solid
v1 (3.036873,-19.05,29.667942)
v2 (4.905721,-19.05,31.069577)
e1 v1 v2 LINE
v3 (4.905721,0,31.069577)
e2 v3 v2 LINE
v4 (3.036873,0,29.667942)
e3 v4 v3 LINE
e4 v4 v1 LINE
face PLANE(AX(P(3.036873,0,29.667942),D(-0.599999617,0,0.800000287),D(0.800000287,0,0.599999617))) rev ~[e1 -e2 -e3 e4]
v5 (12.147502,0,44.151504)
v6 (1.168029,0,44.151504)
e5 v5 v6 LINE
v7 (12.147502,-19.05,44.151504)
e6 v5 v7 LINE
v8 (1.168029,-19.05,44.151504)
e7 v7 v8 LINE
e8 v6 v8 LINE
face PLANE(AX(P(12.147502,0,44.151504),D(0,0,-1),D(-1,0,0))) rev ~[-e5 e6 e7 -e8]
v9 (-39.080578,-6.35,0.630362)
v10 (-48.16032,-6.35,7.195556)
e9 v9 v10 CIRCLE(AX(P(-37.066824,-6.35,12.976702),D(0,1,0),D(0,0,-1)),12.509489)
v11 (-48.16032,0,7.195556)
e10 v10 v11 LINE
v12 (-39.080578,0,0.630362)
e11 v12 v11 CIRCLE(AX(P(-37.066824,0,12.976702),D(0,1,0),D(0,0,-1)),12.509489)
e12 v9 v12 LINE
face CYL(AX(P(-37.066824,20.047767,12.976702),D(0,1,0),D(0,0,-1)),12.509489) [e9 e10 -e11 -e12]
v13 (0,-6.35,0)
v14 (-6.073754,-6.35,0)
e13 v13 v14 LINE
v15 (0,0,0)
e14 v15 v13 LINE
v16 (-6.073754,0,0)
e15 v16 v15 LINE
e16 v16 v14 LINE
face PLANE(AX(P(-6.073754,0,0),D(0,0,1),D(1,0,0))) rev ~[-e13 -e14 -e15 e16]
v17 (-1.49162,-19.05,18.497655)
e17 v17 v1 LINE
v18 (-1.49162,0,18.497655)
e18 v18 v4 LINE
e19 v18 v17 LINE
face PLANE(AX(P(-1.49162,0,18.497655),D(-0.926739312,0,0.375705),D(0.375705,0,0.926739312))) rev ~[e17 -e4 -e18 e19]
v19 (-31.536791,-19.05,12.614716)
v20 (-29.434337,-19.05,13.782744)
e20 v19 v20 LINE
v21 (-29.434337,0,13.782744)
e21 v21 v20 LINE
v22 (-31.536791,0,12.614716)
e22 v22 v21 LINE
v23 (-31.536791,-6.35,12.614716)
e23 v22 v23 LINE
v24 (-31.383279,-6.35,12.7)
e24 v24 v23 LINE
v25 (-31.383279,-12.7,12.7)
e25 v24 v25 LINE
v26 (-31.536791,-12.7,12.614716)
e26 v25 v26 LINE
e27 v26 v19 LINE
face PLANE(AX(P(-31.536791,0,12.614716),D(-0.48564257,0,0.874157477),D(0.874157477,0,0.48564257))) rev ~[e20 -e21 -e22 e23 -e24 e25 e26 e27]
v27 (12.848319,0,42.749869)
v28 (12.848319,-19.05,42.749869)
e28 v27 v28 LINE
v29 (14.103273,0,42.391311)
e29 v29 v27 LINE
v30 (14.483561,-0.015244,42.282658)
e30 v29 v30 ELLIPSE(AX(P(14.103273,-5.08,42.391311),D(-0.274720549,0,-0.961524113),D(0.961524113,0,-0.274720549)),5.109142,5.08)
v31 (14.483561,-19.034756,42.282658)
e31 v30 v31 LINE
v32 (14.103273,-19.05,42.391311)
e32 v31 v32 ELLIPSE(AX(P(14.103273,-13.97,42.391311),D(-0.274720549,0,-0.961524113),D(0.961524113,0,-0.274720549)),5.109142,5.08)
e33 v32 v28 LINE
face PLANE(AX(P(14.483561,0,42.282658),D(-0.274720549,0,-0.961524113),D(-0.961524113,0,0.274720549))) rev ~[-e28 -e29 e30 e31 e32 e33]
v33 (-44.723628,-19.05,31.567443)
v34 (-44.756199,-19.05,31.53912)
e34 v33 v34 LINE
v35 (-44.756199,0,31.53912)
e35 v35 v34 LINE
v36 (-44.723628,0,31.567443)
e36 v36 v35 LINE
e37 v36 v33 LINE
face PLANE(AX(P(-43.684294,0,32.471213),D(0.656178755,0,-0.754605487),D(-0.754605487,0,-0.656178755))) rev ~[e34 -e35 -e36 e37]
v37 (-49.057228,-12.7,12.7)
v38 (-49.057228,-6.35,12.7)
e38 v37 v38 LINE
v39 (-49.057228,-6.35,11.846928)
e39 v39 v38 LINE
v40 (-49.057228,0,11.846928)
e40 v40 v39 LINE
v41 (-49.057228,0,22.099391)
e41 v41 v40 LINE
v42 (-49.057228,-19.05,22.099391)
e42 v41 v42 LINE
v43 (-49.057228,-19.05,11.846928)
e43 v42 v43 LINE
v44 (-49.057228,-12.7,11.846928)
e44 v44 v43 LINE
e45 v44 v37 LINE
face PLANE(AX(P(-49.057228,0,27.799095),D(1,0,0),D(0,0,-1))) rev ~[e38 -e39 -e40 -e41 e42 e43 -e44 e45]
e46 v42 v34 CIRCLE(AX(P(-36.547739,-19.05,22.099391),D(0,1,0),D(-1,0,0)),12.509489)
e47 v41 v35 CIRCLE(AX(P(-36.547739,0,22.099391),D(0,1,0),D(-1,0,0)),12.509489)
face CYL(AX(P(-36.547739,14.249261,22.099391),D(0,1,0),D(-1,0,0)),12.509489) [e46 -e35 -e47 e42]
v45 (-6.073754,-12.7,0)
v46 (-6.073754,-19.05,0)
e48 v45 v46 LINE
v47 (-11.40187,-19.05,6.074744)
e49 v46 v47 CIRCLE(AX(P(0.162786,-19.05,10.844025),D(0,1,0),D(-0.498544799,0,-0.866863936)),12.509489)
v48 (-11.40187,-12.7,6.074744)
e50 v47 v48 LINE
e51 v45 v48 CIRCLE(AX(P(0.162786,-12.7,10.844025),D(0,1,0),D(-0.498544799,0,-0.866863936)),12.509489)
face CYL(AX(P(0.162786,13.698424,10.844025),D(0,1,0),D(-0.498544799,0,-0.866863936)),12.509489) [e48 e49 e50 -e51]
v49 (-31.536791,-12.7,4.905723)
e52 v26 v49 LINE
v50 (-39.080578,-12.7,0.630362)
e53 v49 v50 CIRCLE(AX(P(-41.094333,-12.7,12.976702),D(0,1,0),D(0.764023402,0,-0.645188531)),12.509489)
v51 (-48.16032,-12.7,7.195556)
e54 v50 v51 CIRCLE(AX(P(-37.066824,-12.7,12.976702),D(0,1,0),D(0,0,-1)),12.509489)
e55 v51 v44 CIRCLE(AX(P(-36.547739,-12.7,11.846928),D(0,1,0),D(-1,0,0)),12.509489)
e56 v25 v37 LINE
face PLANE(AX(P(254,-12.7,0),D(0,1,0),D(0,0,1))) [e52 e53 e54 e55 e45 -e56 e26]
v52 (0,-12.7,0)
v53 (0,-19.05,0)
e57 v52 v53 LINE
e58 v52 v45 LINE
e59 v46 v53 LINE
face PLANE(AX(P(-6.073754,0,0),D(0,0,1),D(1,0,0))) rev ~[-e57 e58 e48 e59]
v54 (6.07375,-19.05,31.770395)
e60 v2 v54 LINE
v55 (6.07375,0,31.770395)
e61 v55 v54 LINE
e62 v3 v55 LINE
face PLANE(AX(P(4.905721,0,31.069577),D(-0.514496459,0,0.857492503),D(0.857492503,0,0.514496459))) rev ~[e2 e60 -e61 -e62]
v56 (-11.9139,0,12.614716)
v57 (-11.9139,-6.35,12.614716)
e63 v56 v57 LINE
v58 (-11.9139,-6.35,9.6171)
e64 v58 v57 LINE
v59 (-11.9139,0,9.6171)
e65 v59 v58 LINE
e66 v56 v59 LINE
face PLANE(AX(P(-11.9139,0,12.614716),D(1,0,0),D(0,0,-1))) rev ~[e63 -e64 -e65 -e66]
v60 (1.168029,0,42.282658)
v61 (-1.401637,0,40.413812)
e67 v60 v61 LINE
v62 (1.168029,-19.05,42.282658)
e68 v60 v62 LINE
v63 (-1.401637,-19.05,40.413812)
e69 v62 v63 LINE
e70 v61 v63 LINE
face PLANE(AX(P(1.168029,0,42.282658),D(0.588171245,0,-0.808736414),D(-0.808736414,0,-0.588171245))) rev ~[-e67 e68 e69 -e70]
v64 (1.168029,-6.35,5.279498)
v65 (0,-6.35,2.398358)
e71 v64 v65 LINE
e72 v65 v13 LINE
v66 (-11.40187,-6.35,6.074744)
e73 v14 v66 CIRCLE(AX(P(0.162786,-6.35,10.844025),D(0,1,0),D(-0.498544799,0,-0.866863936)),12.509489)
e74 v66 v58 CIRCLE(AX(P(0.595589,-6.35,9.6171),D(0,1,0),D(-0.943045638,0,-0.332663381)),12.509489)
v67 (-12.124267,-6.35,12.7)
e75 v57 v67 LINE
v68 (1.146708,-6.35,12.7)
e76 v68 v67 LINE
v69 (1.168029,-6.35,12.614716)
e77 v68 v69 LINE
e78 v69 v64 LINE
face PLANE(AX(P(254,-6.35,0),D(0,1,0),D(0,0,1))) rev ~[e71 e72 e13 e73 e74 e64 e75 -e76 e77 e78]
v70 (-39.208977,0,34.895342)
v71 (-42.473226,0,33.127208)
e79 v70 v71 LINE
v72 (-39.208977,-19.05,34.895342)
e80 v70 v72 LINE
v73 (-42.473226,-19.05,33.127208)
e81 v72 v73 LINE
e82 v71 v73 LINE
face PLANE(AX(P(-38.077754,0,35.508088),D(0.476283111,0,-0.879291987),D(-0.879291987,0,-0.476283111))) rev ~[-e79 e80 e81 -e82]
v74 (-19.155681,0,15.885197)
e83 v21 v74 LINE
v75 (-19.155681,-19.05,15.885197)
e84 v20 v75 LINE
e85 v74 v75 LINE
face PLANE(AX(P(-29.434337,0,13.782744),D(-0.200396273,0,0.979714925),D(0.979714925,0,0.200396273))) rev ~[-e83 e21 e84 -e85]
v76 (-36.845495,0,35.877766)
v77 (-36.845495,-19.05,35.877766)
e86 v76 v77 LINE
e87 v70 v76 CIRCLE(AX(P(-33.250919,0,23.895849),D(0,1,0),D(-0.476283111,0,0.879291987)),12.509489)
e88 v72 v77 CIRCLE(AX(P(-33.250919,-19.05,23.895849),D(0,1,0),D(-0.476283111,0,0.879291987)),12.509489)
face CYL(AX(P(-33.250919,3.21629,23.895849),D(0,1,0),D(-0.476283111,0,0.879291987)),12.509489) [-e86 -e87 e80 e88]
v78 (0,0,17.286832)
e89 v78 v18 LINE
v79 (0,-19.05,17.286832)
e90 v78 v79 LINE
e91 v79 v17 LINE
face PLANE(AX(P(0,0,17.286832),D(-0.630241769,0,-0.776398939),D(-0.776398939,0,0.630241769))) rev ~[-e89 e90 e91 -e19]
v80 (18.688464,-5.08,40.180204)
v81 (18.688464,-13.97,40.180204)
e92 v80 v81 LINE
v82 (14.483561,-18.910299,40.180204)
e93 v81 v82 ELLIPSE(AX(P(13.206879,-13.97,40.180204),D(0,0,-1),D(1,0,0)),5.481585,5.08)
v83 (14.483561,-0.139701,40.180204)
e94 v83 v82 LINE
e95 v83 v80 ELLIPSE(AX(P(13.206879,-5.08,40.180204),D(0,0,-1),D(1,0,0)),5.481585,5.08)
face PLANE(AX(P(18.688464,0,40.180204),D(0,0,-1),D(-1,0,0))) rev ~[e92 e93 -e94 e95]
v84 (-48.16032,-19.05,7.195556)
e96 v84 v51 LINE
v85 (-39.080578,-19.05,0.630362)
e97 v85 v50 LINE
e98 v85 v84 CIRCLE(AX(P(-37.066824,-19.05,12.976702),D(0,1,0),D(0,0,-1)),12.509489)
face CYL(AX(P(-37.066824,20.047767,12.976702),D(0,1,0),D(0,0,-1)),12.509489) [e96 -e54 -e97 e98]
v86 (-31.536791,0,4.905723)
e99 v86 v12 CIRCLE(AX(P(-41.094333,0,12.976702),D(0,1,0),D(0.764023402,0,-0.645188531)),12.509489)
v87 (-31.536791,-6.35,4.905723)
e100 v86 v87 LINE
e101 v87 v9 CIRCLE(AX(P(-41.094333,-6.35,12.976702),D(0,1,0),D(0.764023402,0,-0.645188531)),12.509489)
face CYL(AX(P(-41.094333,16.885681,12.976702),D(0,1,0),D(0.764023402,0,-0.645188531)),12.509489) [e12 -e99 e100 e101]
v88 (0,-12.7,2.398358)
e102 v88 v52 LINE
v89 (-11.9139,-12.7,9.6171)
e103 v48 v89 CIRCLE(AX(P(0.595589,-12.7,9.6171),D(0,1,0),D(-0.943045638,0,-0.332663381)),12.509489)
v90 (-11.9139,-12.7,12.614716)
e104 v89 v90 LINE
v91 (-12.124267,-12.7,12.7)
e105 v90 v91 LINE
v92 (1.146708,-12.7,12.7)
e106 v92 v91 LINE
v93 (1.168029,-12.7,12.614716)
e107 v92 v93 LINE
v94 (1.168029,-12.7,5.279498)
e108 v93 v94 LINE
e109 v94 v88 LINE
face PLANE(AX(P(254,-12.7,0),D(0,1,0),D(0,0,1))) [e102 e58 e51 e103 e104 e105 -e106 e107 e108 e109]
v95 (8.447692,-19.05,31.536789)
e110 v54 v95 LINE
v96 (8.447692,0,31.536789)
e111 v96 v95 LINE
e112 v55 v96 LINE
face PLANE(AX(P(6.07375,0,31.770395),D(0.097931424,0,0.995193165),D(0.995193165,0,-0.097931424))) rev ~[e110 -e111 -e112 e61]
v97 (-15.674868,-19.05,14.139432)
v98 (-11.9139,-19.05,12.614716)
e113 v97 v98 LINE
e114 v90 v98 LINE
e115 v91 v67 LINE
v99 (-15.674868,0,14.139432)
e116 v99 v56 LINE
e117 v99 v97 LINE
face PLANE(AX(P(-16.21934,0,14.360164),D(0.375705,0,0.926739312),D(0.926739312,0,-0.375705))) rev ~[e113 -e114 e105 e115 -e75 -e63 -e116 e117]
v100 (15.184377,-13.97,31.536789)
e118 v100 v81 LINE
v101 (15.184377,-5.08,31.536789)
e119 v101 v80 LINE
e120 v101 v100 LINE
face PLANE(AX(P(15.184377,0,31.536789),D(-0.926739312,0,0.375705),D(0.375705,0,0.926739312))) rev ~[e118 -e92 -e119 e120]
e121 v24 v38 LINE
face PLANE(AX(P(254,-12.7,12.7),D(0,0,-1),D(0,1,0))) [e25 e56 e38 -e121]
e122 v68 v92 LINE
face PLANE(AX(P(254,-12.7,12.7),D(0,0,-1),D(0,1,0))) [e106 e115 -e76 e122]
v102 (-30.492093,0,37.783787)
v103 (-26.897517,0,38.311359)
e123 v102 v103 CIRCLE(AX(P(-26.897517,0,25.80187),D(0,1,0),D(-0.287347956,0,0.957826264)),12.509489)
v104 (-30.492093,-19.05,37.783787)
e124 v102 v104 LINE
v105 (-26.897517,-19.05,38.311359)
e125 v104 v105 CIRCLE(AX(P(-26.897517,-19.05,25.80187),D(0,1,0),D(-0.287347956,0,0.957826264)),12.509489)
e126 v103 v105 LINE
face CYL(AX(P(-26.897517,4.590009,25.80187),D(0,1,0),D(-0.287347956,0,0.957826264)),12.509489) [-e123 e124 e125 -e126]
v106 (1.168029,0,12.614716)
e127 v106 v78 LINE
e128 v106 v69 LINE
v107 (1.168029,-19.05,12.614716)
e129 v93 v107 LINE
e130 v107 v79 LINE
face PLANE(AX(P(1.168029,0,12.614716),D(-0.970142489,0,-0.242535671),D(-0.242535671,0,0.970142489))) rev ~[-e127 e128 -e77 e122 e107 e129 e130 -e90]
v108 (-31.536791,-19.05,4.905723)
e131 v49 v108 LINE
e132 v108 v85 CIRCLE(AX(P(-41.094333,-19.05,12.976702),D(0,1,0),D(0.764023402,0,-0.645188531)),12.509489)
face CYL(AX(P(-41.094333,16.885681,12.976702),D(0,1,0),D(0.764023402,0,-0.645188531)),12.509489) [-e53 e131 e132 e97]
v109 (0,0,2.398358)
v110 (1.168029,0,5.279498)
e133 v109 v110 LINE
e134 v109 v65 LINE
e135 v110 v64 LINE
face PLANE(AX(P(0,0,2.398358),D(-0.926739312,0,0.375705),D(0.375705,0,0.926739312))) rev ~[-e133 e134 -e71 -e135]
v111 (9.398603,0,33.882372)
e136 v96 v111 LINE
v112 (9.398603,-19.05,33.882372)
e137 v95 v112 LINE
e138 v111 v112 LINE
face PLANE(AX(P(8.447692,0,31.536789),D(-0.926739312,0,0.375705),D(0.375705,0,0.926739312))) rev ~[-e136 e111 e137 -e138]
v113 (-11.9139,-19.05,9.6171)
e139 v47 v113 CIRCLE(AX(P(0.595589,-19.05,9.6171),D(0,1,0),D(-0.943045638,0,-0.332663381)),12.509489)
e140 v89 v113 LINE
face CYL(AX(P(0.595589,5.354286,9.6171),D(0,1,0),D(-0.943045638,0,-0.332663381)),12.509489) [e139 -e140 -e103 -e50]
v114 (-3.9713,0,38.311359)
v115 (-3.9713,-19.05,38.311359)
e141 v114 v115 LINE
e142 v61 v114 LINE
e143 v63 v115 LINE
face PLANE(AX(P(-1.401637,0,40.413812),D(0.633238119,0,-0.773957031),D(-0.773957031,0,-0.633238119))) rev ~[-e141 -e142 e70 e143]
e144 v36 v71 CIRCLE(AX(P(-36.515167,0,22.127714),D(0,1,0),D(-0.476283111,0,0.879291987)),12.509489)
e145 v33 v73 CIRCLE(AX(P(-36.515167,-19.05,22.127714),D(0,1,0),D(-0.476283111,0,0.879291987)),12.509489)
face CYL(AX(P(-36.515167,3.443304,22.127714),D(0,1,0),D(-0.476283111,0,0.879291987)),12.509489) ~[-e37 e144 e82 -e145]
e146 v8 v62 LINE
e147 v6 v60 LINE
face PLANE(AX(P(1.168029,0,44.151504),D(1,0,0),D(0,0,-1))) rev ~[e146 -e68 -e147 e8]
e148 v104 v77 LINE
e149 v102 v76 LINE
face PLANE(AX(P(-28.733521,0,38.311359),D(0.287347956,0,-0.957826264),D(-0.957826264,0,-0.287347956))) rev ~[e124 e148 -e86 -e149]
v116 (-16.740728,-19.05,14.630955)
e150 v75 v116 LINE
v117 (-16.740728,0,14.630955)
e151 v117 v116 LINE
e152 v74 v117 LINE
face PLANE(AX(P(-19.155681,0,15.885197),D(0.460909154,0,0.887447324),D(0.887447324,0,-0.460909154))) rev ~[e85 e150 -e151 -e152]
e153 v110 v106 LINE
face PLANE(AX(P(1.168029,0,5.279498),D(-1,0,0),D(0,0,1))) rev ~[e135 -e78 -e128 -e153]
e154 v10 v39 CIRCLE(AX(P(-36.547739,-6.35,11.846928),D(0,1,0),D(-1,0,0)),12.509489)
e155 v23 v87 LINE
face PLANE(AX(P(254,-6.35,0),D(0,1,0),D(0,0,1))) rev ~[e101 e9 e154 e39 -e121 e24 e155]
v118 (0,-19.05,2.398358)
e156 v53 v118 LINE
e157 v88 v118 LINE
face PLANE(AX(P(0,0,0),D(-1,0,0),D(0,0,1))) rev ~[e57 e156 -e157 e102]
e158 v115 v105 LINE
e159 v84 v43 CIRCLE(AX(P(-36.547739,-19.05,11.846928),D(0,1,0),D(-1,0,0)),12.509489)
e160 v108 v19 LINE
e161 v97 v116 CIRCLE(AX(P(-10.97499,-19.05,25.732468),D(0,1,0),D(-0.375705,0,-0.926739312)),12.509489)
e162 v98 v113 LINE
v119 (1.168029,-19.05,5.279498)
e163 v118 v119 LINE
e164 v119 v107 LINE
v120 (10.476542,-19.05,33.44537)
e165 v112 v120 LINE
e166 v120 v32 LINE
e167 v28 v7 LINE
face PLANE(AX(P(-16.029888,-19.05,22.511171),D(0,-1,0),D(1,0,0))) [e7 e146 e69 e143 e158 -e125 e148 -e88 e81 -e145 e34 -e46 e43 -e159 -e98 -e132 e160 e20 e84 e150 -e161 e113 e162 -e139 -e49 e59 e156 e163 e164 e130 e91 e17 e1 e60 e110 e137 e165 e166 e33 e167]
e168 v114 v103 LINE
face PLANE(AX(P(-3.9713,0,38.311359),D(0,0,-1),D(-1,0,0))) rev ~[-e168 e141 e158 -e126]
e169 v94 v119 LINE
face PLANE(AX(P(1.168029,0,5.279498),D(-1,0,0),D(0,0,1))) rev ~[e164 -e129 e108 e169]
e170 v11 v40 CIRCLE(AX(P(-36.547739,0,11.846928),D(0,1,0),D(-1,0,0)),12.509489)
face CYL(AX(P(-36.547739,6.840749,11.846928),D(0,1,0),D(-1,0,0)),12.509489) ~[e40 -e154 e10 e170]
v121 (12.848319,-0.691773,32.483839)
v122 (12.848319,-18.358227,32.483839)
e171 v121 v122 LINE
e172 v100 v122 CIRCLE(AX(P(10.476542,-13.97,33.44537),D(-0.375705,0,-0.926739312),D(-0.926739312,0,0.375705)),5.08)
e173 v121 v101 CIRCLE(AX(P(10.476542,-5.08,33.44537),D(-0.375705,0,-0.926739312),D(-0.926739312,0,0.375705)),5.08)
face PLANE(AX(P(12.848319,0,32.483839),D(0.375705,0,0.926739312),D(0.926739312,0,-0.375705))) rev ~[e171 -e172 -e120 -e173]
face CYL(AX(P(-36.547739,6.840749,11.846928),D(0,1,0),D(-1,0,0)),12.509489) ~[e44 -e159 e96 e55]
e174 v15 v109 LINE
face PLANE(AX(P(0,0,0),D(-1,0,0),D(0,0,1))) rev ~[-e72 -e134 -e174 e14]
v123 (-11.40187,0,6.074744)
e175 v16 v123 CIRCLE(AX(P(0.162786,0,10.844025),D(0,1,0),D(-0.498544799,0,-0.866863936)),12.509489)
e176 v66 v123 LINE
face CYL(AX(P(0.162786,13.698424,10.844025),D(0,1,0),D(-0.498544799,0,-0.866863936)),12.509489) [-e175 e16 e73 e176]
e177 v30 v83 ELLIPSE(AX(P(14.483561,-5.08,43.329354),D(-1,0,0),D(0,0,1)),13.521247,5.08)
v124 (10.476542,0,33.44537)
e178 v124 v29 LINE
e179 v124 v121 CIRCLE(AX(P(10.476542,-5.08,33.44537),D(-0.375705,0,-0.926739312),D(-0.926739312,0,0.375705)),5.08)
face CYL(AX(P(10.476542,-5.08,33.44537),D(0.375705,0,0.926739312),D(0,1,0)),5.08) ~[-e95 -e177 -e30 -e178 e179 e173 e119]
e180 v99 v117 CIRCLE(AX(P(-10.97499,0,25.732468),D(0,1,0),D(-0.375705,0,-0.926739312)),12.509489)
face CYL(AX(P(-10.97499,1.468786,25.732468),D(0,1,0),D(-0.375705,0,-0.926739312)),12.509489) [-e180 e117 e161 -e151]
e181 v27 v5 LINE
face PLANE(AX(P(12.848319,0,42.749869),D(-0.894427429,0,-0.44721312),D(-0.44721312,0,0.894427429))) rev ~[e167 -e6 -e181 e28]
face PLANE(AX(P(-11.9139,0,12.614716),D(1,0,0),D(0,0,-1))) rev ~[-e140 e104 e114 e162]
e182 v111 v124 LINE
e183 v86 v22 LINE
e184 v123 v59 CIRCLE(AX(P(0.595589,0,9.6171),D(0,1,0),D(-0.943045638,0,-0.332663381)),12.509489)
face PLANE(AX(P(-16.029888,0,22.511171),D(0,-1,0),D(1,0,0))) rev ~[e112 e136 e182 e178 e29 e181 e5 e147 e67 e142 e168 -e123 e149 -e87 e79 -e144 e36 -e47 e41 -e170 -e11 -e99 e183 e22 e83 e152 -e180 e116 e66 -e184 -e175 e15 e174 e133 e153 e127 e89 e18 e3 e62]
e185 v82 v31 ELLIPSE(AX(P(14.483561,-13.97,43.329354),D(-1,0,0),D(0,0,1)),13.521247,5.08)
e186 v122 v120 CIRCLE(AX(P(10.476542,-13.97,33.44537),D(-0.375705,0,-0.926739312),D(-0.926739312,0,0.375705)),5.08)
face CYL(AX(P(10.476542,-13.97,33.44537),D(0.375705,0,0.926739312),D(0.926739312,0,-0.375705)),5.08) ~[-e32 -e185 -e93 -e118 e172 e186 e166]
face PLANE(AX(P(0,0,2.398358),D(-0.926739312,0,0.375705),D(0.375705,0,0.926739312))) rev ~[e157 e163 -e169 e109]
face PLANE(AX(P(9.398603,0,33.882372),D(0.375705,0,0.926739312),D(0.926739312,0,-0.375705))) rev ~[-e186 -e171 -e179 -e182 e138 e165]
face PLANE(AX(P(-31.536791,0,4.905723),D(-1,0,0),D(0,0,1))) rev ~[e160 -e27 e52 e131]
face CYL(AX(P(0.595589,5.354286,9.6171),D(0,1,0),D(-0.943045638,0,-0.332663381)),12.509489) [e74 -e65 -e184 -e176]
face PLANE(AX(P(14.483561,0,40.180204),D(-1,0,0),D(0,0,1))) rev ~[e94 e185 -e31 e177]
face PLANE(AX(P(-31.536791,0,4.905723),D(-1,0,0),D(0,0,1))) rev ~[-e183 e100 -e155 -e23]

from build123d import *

# Parameters (mm, degrees)
F1_DEPTH     = 19.05
F2_T1_DEPTH  = 28.2300180496
F2_T3_DEPTH  = 25.482580603
F2_T5_DEPTH  = 25.9366089247
F2_T7_DEPTH  = 47.5485210799
F2_T9_DEPTH  = 32.7314977927
F2_T11_DEPTH = 59.1455336843
F2_T13_DEPTH = 52.8213628452
F2_T15_DEPTH = 21.9875710363
F2_T17_DEPTH = 46.4468482438
F2_T19_DEPTH = 29.758572197
F3_R         = 5.08
F5_W         = 6.35
F5_H         = 12.7
F6_DEPTH     = 303.0582275594


# Not quite as in the source:
# - a fillet or chamfer that OpenCascade refuses, or shapes differently, is made with other operations: its cross-section is extruded or revolved along the edge and cut away or added


with BuildPart() as f1:
    # F0 (on Front) → F1 (new body)
    with BuildSketch(Plane.XZ):
        Polygon((-45.0859302655, 0.4672128707), (-34.340060316, 0.4672128707), (-31.5367905423, 4.9057230353), (-31.5367905423, 9.1106286272), (-31.5367905423, 12.6147158444), (-29.4343372807, 13.7827442959), (-19.1556811333, 15.8851970918), (-16.2193404098, 14.3601642462), (-11.9138995651, 12.6147158444), (-11.9138995651, 9.1106286272), (-11.9138995651, 7.4753854424), (-9.811447002, 1.5152803213), (-6.0737542808, 0), (0, 0), (0, 2.3983575983), (1.1680293828, 5.2794977153), (1.1680293828, 9.1106286272), (1.1680293828, 12.6147158444), (0, 17.2868324444), (-1.4916199837, 18.4976548306), (3.0368734151, 29.6679423191), (4.9057211727, 31.0695767403), (6.0737496242, 31.770395115), (8.4476916948, 31.5367886797), (9.3986034807, 33.8823718767), (12.8483185545, 32.4838392109), (15.1843773201, 31.5367886797), (18.6884636059, 40.1802044362), (14.483560808, 40.1802044362), (14.483560808, 42.2826576978), (12.8483185545, 42.7498687059), (12.1475020424, 44.1515035927), (8.1762028858, 44.1515035927), (5.3729321808, 44.1515035927), (1.1680293828, 44.1515035927), (1.1680293828, 42.2826576978), (-1.4016367495, 40.4138118029), (-3.9712996222, 38.3113585413), (-14.7171695717, 38.3113585413), (-22.192556411, 38.3113585413), (-28.7335207686, 38.3113585413), (-38.0777539685, 35.5080878362), (-43.684293516, 32.4712125584), (-49.0572275594, 27.7990954928), (-49.0572275594, 14.9507736787), (-49.0572275594, 9.1106286272), align=None)
    extrude(amount=F1_DEPTH)

    # F2: fillet of radius 12.5094889948 on 10 edges, made by hand

    # F2_s2 → F2_t1 (cut)
    with BuildSketch(Plane.XZ.offset(-4.5900090248)):
        with BuildLine():
            ThreePointArc((-30.4920932473, 37.7837866574), (-28.7140598467, 38.1787628389), (-26.8975171587, 38.3113585413))
            Line((-26.8975171587, 38.3113585413), (-28.7335207686, 38.3113585413))
            Line((-28.7335207686, 38.3113585413), (-30.4920932473, 37.7837866574))
        make_face()
    extrude(amount=F2_T1_DEPTH, mode=Mode.SUBTRACT)

    # F2_s4 → F2_t3 (cut)
    with BuildSketch(Plane.XZ.offset(-3.2162903015)):
        with BuildLine():
            ThreePointArc((-39.2089772844, 34.8953419361), (-38.0524286269, 35.4471609705), (-36.8454950389, 35.8777656133))
            Line((-36.8454950389, 35.8777656133), (-38.0777539685, 35.5080878362))
            Line((-38.0777539685, 35.5080878362), (-39.2089772844, 34.8953419361))
        make_face()
    extrude(amount=F2_T3_DEPTH, mode=Mode.SUBTRACT)

    # F2_s6 → F2_t5 (cut)
    with BuildSketch(Plane.XZ.offset(-3.4433044624)):
        with BuildLine():
            ThreePointArc((-42.4732255071, 33.1272076629), (-43.6412308258, 32.4090824128), (-44.7236280922, 31.5674432638))
            Line((-44.7236280922, 31.5674432638), (-43.684293516, 32.4712125584))
            Line((-43.684293516, 32.4712125584), (-42.4732255071, 33.1272076629))
        make_face()
    extrude(amount=F2_T5_DEPTH, mode=Mode.SUBTRACT)

    # F2_s8 → F2_t7 (cut)
    with BuildSketch(Plane.XZ.offset(-14.2492605399)):
        with BuildLine():
            ThreePointArc((-49.0572275594, 22.0993912768), (-47.9313005389, 27.2860888474), (-44.7561994839, 31.5391203114))
            Line((-44.7561994839, 31.5391203114), (-49.0572275594, 27.7990954928))
            Line((-49.0572275594, 27.7990954928), (-49.0572275594, 22.0993912768))
        make_face()
    extrude(amount=F2_T7_DEPTH, mode=Mode.SUBTRACT)

    # F2_s10 → F2_t9 (cut)
    with BuildSketch(Plane.XZ.offset(-6.8407488963)):
        with BuildLine():
            ThreePointArc((-49.0572275594, 11.8469281858), (-48.7682894076, 9.1738303565), (-47.9148224607, 6.6242163797))
            Line((-47.9148224607, 6.6242163797), (-49.0572275594, 9.1106286272))
            Line((-49.0572275594, 9.1106286272), (-49.0572275594, 11.8469281858))
        make_face()
    extrude(amount=F2_T9_DEPTH, mode=Mode.SUBTRACT)

    # F2_s12 → F2_t11 (cut)
    with BuildSketch(Plane.XZ.offset(-20.0477668422)):
        with BuildLine():
            ThreePointArc((-37.0668235286, 0.4672128707), (-43.8178922977, 2.4453018928), (-48.4339074248, 7.7539900595))
            Line((-48.4339074248, 7.7539900595), (-45.0859302655, 0.4672128707))
            Line((-45.0859302655, 0.4672128707), (-37.0668235286, 0.4672128707))
        make_face()
    extrude(amount=F2_T11_DEPTH, mode=Mode.SUBTRACT)

    # F2_s14 → F2_t13 (cut)
    with BuildSketch(Plane.XZ.offset(-16.8856814226)):
        with BuildLine():
            ThreePointArc((-31.5367905423, 4.9057230353), (-35.825391148, 1.6309728064), (-41.0943328851, 0.4672128707))
            Line((-41.0943328851, 0.4672128707), (-34.340060316, 0.4672128707))
            Line((-34.340060316, 0.4672128707), (-31.5367905423, 4.9057230353))
        make_face()
    extrude(amount=F2_T13_DEPTH, mode=Mode.SUBTRACT)

    # F2_s16 → F2_t15 (cut)
    with BuildSketch(Plane.XZ.offset(-1.4687855182)):
        with BuildLine():
            ThreePointArc((-15.6748678973, 14.139432221), (-16.2135660804, 14.3726858024), (-16.7407283206, 14.6309549221))
            Line((-16.7407283206, 14.6309549221), (-16.2193404098, 14.3601642462))
            Line((-16.2193404098, 14.3601642462), (-15.6748678973, 14.139432221))
        make_face()
    extrude(amount=F2_T15_DEPTH, mode=Mode.SUBTRACT)

    # F2_s18 → F2_t17 (cut)
    with BuildSketch(Plane.XZ.offset(-13.6984241219)):
        with BuildLine():
            ThreePointArc((-6.0737542808, 0), (-9.4531651589, 2.8427255588), (-11.6342326331, 6.6825759671))
            Line((-11.6342326331, 6.6825759671), (-9.811447002, 1.5152803213))
            Line((-9.811447002, 1.5152803213), (-6.0737542808, 0))
        make_face()
    extrude(amount=F2_T17_DEPTH, mode=Mode.SUBTRACT)

    # F2_s20 → F2_t19 (cut)
    with BuildSketch(Plane.XZ.offset(-5.3542860985)):
        with BuildLine():
            ThreePointArc((-11.2014295993, 5.4556509826), (-11.7344956192, 7.5061006875), (-11.9138995651, 9.6170998818))
            Line((-11.9138995651, 9.6170998818), (-11.9138995651, 7.4753854424))
            Line((-11.9138995651, 7.4753854424), (-11.2014295993, 5.4556509826))
        make_face()
    extrude(amount=F2_T19_DEPTH, mode=Mode.SUBTRACT)

    # F3
    f3_edges = [f1.edges().sort_by_distance(p)[0] for p in [
        (16.93642, 0, 35.858497),
        (16.93642, -19.05, 35.858497),
    ]]
    fillet(f3_edges, radius=F3_R)

    # F5 (on offset) → F6 (cut, through all)
    with BuildSketch(Plane.YZ.offset(254)):
        with Locations((-9.525, 6.35)):
            Rectangle(F5_W, F5_H)
    extrude(amount=-F6_DEPTH, mode=Mode.SUBTRACT)


solid = f1.part
